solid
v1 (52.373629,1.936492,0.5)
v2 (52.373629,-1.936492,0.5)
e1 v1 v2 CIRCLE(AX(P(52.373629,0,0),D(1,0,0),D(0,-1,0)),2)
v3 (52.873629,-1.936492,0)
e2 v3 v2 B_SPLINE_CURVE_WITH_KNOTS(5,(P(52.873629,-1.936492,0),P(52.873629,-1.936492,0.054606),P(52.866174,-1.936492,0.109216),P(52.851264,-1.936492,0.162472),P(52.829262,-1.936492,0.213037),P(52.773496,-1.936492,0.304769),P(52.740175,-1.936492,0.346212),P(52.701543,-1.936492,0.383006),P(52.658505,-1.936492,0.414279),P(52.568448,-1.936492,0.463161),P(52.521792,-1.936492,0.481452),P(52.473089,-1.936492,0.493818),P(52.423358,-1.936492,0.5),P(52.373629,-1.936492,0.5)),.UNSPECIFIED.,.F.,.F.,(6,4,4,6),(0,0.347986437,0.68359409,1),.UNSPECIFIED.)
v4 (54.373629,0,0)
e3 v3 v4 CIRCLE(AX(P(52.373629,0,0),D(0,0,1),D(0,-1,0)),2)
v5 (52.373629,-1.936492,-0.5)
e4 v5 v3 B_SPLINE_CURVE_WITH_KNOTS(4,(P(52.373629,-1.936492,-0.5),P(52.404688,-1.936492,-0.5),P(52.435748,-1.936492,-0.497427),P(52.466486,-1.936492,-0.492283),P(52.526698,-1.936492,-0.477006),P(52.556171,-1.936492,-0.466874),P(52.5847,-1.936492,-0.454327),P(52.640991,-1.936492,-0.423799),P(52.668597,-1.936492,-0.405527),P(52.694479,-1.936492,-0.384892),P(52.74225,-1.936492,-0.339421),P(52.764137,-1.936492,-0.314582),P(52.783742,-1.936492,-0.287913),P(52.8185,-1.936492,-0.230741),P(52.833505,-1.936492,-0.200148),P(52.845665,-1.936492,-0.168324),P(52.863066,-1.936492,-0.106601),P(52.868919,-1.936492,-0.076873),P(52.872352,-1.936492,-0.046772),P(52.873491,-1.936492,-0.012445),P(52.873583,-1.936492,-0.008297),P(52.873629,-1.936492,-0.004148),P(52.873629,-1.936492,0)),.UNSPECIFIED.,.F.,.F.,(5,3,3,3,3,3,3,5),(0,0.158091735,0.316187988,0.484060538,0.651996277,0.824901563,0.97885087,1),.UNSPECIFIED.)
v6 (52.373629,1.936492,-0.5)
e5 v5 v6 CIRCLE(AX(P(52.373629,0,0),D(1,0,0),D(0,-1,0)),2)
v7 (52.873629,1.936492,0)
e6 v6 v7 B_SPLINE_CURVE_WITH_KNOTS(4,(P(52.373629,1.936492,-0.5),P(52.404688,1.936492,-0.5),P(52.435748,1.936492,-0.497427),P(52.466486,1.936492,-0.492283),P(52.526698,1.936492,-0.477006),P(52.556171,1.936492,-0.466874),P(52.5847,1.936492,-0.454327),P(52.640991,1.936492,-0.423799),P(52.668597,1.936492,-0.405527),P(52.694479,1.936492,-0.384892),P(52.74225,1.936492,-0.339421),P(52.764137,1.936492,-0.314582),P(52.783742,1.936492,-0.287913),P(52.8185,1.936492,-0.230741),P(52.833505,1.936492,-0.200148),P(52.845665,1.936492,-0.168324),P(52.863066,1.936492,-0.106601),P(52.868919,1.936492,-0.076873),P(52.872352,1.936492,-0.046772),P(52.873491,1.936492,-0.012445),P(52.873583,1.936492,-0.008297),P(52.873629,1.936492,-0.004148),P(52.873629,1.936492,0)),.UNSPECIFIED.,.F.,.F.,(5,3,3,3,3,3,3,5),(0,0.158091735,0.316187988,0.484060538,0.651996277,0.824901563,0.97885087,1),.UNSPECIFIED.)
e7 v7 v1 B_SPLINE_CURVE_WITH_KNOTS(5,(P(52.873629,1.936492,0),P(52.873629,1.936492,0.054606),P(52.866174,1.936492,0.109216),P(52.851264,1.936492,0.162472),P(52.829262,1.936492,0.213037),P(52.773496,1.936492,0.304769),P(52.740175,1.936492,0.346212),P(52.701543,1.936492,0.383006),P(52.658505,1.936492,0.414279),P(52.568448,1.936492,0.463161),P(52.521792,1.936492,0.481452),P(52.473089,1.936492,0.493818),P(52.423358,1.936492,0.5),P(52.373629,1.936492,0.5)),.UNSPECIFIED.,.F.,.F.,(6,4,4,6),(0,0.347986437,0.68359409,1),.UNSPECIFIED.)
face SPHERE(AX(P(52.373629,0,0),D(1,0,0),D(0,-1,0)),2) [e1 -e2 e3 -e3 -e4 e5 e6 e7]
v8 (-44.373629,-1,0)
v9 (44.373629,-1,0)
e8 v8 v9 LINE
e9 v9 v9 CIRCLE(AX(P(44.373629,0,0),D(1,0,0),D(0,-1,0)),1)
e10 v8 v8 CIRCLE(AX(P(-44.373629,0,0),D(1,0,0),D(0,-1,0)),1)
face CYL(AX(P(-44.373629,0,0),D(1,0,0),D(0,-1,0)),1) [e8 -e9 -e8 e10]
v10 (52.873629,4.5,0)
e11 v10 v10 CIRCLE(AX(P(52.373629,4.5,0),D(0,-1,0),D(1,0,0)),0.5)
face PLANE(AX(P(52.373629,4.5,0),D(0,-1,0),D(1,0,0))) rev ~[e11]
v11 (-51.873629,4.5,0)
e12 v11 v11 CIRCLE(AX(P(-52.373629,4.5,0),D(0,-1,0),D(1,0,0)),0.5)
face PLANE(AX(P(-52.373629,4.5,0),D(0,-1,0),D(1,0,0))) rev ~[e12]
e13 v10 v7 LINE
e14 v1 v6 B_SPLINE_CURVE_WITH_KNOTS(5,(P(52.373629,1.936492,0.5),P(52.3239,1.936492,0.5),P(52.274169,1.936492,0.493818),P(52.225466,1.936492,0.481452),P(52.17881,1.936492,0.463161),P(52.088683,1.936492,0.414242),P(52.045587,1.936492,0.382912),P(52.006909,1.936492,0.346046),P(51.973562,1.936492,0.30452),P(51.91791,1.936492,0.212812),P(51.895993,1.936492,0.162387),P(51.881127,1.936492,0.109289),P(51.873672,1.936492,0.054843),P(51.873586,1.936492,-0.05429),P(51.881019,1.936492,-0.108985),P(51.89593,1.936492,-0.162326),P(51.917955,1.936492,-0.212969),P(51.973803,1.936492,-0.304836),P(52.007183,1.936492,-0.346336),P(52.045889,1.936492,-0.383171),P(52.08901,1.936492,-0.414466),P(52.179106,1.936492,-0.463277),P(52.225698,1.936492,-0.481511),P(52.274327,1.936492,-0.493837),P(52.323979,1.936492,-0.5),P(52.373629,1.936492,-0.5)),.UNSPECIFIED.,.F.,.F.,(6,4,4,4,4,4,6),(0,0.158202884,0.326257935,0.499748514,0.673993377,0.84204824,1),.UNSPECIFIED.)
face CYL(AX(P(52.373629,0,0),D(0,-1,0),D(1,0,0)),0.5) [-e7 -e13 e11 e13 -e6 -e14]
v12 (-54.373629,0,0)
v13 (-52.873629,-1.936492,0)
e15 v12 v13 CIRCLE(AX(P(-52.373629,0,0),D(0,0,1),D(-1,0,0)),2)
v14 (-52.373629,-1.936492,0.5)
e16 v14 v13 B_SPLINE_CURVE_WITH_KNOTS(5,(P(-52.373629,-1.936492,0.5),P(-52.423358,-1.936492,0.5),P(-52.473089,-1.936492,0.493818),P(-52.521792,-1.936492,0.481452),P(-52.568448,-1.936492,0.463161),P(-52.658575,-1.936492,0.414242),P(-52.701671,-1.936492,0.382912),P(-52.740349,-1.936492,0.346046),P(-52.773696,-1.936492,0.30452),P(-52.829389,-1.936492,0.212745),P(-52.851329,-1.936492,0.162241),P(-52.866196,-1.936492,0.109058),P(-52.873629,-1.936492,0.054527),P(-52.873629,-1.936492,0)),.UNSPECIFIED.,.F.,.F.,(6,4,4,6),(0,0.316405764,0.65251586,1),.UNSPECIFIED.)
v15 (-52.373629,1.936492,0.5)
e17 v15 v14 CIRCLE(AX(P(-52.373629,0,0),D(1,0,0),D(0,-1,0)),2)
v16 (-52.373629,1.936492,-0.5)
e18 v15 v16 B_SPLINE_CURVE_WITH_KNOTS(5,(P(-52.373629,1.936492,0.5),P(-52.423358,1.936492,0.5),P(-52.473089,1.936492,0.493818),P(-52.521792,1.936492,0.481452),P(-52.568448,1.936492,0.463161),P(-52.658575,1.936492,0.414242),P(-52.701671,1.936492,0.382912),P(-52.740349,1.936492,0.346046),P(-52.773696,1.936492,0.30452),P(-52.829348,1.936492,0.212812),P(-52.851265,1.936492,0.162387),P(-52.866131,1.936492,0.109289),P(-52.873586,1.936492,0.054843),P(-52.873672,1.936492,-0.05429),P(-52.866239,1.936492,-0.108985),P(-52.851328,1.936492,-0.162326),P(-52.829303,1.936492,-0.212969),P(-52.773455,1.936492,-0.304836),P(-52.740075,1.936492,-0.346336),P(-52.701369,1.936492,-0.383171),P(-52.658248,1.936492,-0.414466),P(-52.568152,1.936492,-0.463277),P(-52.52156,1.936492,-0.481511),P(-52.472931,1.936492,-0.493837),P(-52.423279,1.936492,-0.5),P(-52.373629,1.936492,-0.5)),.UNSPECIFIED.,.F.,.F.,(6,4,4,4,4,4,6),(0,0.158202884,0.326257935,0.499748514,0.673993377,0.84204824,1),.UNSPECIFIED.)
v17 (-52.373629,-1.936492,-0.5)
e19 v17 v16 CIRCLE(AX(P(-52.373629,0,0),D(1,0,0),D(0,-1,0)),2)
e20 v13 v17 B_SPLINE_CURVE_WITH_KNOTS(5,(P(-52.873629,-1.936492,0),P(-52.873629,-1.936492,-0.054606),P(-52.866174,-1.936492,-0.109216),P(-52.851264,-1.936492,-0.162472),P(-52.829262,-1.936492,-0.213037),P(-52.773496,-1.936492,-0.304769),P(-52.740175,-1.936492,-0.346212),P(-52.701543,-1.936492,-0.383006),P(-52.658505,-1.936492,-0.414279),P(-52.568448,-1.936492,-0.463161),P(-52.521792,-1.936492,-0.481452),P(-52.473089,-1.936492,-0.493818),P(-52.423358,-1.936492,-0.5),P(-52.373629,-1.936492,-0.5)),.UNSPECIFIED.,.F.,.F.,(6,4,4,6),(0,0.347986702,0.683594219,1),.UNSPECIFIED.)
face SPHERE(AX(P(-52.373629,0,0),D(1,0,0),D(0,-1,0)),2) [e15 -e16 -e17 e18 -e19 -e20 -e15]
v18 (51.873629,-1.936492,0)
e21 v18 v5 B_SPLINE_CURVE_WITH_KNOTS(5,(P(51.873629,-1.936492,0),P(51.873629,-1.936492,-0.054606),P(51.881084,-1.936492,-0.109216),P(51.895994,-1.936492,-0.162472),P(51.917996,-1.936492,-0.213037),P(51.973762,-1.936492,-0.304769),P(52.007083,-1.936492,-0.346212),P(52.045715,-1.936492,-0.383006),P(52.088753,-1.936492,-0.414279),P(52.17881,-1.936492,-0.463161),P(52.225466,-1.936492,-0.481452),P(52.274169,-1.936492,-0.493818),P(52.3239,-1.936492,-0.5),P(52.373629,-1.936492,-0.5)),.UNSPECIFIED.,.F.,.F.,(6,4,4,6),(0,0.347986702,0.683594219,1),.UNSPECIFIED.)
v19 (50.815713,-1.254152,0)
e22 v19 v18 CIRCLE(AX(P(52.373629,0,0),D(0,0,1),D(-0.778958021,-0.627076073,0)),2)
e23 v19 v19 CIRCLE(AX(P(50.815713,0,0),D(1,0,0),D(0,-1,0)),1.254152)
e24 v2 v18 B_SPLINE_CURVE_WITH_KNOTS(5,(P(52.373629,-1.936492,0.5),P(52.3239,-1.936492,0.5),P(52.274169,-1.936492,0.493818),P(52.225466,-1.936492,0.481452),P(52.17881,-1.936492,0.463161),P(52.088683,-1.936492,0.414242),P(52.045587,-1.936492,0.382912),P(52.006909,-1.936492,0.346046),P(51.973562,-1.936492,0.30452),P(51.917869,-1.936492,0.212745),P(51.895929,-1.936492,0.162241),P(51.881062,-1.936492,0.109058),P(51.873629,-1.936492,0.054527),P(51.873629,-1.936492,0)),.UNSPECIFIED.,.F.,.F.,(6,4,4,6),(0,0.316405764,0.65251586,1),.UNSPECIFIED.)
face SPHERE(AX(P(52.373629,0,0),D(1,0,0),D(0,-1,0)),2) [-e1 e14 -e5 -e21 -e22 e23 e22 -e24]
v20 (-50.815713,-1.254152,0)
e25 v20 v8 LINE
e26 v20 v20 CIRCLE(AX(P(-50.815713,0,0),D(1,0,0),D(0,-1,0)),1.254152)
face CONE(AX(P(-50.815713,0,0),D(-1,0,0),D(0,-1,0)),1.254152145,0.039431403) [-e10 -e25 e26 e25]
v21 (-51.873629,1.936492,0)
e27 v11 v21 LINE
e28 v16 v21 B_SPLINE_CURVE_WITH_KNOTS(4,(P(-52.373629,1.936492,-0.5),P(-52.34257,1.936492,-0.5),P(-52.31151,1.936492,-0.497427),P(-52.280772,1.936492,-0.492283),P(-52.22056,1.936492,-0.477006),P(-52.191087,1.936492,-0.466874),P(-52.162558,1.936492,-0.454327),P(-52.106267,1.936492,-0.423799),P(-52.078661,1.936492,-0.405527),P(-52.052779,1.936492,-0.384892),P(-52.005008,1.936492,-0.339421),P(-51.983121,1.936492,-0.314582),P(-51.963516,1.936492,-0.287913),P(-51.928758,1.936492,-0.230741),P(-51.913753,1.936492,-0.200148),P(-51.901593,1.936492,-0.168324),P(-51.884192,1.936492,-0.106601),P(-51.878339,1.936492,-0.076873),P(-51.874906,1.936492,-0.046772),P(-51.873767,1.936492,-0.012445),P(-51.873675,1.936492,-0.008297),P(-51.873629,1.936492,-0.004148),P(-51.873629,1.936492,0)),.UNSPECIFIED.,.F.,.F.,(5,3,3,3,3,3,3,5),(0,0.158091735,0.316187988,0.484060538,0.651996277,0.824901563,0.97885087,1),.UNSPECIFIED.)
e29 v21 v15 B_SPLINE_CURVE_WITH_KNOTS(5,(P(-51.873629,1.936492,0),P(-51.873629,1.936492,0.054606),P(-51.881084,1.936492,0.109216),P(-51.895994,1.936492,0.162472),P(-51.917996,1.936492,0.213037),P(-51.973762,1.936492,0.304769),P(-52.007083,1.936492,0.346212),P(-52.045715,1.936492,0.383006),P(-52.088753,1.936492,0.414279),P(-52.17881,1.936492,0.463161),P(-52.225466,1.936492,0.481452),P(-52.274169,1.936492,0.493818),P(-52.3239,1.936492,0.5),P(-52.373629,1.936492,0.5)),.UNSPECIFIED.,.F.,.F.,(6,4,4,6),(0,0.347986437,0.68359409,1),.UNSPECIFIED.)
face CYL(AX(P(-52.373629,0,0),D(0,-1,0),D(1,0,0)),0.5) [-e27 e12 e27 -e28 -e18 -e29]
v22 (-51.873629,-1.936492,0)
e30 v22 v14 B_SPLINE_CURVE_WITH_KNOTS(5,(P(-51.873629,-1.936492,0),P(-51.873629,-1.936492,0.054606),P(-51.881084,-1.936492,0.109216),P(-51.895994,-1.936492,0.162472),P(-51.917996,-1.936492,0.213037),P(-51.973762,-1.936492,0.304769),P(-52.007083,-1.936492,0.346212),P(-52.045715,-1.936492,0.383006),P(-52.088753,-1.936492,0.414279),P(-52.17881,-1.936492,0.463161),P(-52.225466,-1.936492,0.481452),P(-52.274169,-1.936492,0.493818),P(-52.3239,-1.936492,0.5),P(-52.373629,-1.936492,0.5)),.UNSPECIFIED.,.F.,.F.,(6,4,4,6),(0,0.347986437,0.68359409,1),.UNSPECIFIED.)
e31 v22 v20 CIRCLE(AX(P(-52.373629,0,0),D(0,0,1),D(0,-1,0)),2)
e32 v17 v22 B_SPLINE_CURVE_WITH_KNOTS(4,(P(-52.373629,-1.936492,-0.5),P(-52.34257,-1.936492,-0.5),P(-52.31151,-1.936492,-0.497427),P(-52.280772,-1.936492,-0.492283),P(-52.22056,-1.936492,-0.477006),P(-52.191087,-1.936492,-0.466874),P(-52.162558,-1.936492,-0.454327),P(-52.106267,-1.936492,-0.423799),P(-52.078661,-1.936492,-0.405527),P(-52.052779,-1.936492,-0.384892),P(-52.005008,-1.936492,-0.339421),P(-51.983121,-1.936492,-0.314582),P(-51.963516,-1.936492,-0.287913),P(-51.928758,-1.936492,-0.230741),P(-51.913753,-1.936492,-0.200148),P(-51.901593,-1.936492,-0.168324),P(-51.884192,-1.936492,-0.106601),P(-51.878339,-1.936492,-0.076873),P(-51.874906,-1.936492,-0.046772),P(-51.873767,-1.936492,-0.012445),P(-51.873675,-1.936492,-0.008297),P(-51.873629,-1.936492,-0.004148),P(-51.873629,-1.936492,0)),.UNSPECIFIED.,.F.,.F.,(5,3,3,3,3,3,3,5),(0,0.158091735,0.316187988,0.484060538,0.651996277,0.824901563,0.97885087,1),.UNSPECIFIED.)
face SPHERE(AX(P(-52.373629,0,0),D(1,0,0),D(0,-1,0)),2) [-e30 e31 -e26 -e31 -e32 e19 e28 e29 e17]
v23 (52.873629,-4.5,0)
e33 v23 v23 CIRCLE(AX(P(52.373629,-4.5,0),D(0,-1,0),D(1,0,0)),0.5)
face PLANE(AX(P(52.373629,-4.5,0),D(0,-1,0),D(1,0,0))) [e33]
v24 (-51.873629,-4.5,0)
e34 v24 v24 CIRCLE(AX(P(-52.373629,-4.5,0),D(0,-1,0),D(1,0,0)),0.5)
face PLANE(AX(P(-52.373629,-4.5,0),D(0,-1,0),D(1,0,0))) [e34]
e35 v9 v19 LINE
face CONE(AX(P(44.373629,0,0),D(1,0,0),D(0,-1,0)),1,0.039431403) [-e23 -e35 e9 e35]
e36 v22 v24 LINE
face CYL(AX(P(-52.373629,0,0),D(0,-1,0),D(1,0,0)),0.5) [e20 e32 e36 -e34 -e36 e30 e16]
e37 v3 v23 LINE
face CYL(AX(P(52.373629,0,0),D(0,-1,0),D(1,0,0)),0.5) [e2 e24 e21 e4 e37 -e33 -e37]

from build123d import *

# Parameters (mm, degrees)
F2_R     = 0.5
F3_DEPTH = 4.5
F4_R     = 0.5
F5_DEPTH = 4.5


# Not quite as in the source:
# - a feature names something its author has since deleted; it is built from what else it names


with BuildPart() as f1:
    # F0 (on Top) → F1 (revolve)
    with BuildSketch(Plane.XY):
        with BuildLine():
            Line((44.3736289605, -1), (50.8157129178, -1.2541521454))
            ThreePointArc((50.8157129178, -1.2541521454), (50.4873850625, -0.6648939444), (50.3736289605, 0))
            Line((50.3736289605, 0), (-50.3736289605, 0))
            ThreePointArc((-50.3736289605, 0), (-50.4873850625, -0.6648939444), (-50.8157129178, -1.2541521454))
            Line((-50.8157129178, -1.2541521454), (-44.3736289605, -1))
            Line((-44.3736289605, -1), (44.3736289605, -1))
        make_face()
        with BuildLine():
            ThreePointArc((-50.8157129178, -1.2541521454), (-50.4873850625, -0.6648939444), (-50.3736289605, 0))
            Line((-50.3736289605, 0), (-51.8736289605, 0))
            Line((-51.8736289605, 0), (-52.8736289605, 0))
            Line((-52.8736289605, 0), (-54.3736289605, 0))
            ThreePointArc((-54.3736289605, 0), (-53.7878425229, -1.4142135624), (-52.3736289605, -2))
            ThreePointArc((-52.3736289605, -2), (-51.5100041261, -1.8039268681), (-50.8157129178, -1.2541521454))
        make_face()
        with BuildLine():
            ThreePointArc((52.3736289605, -2), (53.7878425229, -1.4142135624), (54.3736289605, 0))
            Line((54.3736289605, 0), (52.8736289605, 0))
            Line((52.8736289605, 0), (52.3736289605, 0))
            Line((52.3736289605, 0), (51.8736289605, 0))
            Line((51.8736289605, 0), (50.3736289605, 0))
            ThreePointArc((50.3736289605, 0), (50.4873850625, -0.6648939444), (50.8157129178, -1.2541521454))
            ThreePointArc((50.8157129178, -1.2541521454), (51.5100041261, -1.8039268681), (52.3736289605, -2))
        make_face()
    revolve(axis=Axis((0, 0, 0), (1, 0, 0)))

    # F2 (on Front) → F3 (join, symmetric)
    with BuildSketch(Plane.XZ):
        with Locations((-52.3736289605, 0)):
            Circle(F2_R)
    extrude(amount=F3_DEPTH, both=True)

    # F4 (on Front) → F5 (join, symmetric)
    with BuildSketch(Plane.XZ):
        with Locations((52.3736289605, 0)):
            Circle(F4_R)
    extrude(amount=F5_DEPTH, both=True)


solid = f1.part
